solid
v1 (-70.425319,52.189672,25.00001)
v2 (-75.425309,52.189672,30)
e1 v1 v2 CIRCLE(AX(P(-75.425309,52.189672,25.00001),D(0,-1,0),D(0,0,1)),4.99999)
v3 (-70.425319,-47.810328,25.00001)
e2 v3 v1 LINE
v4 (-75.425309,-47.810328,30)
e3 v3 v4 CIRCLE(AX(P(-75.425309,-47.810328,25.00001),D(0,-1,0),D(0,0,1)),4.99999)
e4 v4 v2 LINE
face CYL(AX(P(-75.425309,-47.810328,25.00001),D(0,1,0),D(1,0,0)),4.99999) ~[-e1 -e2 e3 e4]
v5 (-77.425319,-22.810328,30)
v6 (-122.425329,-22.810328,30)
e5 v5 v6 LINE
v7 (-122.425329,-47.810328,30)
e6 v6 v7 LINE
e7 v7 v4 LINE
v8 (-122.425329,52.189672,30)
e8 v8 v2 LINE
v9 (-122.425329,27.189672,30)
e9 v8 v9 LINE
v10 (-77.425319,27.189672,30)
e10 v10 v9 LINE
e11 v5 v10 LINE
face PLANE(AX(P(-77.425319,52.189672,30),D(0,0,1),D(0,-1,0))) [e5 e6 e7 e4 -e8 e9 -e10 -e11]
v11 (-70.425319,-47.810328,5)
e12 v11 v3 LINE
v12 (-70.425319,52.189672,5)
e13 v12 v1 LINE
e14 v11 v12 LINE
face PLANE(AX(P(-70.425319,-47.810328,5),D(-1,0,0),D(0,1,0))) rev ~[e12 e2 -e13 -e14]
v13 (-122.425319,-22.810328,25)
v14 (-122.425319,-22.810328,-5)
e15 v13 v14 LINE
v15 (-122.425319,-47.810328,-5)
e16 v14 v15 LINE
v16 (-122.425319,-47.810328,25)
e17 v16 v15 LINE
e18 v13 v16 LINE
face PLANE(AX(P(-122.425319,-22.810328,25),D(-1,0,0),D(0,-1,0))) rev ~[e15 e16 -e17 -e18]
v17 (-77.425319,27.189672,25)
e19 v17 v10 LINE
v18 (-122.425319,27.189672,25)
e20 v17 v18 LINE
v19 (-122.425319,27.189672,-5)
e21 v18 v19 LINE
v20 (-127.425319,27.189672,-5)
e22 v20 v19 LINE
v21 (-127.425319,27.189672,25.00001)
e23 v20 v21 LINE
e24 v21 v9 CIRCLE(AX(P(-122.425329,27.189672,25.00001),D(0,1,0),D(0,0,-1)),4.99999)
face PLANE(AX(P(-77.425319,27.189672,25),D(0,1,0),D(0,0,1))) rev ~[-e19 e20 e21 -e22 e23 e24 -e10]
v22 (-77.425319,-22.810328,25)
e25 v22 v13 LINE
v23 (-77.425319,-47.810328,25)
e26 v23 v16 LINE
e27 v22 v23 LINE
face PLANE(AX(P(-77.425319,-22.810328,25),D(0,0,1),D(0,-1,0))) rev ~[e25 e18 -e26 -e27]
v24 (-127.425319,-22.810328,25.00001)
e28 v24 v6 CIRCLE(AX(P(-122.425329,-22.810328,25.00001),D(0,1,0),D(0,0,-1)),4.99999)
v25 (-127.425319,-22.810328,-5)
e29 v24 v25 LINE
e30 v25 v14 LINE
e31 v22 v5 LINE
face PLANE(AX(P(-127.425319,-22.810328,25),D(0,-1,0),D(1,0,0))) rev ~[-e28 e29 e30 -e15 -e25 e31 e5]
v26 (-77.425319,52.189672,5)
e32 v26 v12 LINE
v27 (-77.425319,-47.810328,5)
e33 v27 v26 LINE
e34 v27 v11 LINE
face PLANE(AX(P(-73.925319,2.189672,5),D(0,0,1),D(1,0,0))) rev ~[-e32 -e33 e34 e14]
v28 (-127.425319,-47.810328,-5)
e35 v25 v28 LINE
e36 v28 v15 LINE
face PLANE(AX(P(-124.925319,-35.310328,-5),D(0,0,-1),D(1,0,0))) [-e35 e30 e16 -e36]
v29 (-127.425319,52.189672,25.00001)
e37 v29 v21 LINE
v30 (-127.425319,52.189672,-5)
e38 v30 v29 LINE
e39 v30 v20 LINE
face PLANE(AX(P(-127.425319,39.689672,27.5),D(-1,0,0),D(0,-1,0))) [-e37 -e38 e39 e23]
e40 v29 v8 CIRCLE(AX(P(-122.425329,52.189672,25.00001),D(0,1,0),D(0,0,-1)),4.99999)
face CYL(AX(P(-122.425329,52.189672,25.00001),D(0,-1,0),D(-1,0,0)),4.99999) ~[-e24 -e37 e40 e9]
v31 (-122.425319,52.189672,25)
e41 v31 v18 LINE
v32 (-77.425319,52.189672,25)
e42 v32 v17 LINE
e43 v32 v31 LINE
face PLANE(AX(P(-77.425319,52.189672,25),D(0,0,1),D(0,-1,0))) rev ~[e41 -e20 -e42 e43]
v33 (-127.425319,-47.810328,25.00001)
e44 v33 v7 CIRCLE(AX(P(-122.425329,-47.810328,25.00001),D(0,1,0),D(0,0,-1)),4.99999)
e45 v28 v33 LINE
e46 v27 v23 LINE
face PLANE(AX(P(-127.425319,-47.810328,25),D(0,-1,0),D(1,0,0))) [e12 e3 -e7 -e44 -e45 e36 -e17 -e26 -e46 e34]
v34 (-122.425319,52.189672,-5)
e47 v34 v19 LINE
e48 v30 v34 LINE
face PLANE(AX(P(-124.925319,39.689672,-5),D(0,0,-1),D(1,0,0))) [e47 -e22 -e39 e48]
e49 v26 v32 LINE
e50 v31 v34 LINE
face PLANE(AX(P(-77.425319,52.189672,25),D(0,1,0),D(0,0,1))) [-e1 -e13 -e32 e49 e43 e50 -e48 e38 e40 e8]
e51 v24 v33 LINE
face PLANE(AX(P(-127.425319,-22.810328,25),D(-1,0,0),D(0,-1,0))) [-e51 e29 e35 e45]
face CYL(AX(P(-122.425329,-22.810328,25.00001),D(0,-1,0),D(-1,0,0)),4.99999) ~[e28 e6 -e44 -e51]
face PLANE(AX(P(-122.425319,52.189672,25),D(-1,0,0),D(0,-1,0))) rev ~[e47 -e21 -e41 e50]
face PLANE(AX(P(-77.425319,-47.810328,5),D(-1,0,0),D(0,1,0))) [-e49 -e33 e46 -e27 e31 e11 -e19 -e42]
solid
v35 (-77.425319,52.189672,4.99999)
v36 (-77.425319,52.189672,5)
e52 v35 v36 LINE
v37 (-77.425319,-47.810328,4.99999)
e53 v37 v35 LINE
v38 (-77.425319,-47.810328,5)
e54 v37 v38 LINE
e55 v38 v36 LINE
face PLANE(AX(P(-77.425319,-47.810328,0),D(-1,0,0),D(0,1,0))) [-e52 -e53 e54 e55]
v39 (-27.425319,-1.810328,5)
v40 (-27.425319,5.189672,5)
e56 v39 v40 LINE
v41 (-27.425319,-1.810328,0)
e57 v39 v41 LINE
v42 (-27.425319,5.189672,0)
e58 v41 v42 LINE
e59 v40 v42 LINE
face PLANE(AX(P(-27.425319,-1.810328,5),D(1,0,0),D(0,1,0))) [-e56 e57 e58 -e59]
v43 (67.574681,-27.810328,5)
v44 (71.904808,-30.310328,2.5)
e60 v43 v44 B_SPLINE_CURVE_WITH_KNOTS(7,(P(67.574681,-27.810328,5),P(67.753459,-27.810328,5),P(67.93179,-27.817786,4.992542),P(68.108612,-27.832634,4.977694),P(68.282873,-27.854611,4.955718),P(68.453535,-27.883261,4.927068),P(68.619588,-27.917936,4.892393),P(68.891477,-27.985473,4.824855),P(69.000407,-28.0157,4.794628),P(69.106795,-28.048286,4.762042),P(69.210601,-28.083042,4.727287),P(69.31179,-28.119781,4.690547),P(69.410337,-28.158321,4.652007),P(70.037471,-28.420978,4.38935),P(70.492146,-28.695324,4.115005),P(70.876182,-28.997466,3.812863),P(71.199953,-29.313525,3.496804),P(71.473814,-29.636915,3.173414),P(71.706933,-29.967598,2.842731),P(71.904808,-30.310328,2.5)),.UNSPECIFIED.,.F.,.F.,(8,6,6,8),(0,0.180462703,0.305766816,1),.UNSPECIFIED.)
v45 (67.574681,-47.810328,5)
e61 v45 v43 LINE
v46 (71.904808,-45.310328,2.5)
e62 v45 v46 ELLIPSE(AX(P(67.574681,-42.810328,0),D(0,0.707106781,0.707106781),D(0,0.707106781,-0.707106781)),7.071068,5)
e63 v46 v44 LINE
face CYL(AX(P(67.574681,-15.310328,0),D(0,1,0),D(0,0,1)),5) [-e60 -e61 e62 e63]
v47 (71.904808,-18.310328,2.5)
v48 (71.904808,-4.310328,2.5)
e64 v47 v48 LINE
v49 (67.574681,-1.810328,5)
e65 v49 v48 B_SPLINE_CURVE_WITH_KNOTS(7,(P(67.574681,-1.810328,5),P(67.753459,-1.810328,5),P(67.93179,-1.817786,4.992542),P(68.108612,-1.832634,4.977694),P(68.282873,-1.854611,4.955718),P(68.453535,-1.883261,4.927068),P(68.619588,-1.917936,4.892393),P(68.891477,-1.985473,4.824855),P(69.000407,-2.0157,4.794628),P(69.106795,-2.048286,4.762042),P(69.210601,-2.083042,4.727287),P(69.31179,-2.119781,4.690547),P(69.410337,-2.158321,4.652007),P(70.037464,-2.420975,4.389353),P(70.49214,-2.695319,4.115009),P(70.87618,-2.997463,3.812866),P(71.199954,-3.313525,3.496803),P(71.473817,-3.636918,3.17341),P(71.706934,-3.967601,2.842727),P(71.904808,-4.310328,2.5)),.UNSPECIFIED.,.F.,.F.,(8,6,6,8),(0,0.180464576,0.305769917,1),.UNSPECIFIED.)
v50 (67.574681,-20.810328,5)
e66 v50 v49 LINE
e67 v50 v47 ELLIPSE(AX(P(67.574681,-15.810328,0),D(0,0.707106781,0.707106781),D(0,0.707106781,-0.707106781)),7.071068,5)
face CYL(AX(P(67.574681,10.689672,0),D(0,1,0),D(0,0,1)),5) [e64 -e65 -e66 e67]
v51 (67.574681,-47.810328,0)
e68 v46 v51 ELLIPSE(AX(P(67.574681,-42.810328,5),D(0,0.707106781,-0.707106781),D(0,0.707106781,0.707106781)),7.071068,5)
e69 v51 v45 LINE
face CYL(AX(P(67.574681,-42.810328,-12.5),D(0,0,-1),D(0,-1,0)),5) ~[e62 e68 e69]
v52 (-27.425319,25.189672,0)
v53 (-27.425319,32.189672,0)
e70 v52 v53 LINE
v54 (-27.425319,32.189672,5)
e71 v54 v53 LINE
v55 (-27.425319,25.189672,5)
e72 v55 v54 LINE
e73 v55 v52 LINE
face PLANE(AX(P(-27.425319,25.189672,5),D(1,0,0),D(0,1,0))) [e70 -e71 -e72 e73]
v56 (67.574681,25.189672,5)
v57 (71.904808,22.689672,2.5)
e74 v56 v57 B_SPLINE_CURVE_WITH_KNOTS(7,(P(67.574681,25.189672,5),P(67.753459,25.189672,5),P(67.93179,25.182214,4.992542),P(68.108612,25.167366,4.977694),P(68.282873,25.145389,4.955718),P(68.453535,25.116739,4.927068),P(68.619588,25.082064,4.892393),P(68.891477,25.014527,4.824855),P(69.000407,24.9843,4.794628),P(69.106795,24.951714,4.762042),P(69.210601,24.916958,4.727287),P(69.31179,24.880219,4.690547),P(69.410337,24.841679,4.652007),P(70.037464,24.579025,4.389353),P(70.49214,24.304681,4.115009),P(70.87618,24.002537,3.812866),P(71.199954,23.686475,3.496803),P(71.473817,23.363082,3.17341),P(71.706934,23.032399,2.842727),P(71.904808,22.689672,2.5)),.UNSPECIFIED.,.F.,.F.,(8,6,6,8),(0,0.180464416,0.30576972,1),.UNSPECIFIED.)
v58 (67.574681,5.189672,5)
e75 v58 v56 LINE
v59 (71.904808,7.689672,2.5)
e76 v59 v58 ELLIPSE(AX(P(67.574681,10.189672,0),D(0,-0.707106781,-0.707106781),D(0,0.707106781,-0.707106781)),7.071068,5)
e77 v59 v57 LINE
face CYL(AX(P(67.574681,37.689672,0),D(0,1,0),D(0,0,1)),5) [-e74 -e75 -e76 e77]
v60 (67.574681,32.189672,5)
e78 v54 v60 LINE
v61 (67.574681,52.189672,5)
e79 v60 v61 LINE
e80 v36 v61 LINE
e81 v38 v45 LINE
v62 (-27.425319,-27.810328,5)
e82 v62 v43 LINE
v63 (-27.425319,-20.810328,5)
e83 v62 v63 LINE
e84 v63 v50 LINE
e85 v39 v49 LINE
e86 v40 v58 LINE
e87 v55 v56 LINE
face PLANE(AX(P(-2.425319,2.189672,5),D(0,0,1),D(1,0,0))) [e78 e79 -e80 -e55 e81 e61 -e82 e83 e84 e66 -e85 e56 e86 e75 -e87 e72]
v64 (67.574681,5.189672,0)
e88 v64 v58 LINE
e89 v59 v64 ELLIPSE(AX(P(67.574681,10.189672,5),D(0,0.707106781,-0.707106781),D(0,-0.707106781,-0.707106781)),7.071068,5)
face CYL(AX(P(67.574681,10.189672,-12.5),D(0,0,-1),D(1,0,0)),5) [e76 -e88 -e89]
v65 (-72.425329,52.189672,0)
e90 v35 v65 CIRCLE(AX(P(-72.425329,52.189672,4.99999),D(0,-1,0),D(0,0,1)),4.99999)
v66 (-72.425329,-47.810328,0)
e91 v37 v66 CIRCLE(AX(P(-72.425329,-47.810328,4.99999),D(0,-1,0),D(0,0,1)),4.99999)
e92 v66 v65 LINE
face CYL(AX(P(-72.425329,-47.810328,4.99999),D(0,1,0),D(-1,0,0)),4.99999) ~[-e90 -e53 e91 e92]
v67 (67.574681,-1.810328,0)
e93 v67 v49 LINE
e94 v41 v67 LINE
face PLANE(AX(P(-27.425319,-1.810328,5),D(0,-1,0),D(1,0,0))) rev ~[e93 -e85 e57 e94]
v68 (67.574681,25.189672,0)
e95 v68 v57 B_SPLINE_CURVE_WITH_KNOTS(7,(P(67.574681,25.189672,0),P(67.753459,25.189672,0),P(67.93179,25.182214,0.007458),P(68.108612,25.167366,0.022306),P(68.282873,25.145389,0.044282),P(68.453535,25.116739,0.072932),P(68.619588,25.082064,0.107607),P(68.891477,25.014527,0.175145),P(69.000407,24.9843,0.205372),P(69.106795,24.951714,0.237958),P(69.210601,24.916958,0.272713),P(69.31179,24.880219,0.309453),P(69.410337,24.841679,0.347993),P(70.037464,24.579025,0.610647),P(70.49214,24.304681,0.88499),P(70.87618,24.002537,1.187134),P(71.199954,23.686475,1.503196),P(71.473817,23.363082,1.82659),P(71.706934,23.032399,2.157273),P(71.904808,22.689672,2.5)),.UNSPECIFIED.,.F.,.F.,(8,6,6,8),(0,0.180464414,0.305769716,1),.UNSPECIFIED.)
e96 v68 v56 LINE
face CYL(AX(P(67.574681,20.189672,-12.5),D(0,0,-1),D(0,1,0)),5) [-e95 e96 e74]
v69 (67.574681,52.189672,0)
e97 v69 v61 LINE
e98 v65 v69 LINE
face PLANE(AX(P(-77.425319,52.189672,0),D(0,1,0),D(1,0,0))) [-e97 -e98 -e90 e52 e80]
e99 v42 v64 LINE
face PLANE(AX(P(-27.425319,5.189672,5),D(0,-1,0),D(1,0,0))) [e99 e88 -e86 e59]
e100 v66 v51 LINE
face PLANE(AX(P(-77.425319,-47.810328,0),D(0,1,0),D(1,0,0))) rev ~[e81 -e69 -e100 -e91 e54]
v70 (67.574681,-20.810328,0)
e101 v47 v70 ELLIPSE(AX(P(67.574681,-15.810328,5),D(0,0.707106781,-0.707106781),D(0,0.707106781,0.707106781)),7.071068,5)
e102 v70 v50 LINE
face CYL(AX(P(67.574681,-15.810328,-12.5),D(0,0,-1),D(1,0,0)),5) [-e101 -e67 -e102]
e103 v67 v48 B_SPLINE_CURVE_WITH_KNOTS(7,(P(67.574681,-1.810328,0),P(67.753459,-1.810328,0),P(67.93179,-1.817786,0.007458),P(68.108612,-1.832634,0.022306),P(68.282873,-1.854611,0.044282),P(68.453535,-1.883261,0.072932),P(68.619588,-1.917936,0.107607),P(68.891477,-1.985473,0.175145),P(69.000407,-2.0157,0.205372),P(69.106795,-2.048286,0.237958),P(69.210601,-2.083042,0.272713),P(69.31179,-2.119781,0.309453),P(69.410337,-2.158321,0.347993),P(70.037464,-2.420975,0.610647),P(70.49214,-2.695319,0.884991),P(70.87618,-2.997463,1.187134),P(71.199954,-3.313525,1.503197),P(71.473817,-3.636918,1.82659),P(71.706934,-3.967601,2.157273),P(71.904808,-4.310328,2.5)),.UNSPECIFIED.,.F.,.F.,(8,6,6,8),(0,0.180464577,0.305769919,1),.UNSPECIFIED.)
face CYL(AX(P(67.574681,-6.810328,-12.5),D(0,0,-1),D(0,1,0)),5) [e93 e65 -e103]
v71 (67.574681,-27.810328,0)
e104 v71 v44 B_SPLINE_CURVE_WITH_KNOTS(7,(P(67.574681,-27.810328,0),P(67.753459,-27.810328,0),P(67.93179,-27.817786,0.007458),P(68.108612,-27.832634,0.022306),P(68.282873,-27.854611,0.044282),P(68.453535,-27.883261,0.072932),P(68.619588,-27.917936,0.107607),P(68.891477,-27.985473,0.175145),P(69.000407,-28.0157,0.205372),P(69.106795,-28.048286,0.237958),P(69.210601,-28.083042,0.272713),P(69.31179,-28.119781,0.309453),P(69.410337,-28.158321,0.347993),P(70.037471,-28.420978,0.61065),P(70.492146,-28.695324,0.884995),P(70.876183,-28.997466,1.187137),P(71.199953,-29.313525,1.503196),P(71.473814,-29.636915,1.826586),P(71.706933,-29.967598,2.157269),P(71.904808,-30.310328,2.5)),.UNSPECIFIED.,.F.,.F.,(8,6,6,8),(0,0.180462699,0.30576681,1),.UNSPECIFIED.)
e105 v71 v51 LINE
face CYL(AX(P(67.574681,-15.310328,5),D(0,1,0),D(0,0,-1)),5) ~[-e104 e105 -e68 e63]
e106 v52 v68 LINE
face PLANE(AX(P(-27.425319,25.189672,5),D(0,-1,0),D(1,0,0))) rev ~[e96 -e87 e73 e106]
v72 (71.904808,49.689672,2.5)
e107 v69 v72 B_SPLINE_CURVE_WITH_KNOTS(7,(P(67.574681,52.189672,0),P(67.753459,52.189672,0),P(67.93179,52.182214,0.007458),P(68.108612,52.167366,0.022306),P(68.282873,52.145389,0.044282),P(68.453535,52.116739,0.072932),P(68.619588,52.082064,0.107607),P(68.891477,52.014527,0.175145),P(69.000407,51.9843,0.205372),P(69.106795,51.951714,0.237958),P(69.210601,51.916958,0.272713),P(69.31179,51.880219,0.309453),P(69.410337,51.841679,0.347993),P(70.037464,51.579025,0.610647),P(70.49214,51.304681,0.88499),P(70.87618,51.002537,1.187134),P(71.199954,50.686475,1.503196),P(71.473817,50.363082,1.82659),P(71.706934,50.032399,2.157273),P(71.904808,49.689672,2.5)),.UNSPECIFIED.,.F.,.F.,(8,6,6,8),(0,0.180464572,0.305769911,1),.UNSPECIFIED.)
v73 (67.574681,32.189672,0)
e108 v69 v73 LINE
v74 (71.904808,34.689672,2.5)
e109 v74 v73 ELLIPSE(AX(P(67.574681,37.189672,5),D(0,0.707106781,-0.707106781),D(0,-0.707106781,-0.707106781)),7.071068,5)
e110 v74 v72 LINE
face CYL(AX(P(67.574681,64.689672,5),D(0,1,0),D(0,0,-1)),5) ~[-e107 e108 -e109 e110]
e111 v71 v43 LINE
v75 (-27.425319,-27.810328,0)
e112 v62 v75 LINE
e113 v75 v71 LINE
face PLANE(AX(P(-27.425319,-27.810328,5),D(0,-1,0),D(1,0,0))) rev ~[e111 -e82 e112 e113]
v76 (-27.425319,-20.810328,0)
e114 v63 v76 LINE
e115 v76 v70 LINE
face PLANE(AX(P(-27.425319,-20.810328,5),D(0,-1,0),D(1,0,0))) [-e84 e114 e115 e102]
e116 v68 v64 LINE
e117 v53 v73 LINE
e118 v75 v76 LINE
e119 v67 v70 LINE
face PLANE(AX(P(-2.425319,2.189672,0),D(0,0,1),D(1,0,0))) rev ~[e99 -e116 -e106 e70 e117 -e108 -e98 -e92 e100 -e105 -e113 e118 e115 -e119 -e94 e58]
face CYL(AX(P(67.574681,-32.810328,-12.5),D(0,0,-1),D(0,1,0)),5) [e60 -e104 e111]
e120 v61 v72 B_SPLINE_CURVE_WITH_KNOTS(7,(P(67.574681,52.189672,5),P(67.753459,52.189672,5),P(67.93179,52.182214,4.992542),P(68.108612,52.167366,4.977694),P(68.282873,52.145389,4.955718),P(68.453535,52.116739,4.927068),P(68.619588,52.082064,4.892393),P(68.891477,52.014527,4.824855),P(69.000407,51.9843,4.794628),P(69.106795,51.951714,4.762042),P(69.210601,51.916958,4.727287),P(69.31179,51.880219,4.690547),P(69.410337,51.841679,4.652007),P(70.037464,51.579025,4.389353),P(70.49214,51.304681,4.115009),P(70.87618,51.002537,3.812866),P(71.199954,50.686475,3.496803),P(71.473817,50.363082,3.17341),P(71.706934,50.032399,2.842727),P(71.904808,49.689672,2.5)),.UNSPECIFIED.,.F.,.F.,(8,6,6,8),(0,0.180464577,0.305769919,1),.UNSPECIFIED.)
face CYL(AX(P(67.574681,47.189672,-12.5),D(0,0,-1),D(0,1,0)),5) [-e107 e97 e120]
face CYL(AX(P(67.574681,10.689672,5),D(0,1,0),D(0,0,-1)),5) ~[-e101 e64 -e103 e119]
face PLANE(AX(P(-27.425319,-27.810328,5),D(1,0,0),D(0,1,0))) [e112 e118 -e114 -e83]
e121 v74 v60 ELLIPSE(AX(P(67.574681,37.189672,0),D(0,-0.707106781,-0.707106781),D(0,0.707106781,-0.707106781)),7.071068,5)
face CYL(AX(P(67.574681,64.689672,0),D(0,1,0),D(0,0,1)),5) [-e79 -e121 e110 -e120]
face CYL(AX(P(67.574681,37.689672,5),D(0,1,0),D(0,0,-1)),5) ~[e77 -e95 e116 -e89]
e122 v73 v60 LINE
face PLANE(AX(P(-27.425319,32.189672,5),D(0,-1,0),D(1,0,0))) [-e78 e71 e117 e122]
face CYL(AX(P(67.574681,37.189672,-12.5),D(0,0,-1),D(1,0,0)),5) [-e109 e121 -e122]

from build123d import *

# Parameters (mm, degrees)
F0_W         = 150
F0_H         = 100
F1_DEPTH     = 5
F2_W         = 100
F2_H         = 7
F3_DEPTH     = 5.001
F4_W         = 7
F4_H         = 100
F5_DEPTH     = 25
F6_W         = 25
F6_H         = 5
F7_DEPTH     = 50
F9_W         = 5
F9_H         = 25
F8_W         = 5
F8_H         = 25
F10_DEPTH    = 30
F11_R        = 4.99999
F11_2_R      = 4.99999
F12_T1_DEPTH = 45
F12_T3_DEPTH = 30
F12_T5_DEPTH = 44
F12_T7_DEPTH = 45
F12_T9_DEPTH = 45


# Not quite as in the source:
# - a fillet or chamfer that OpenCascade refuses, or shapes differently, is made with other operations: its cross-section is extruded or revolved along the edge and cut away or added
# - a fillet or chamfer is up to 0.001 mm smaller than in the source, because OpenCascade refuses the exact size


with BuildPart() as f1:
    # F0 (on Top) → F1 (new body)
    with BuildSketch(Plane.XY):
        with Locations((-2.425318882, 2.1896716207)):
            Rectangle(F0_W, F0_H)
    extrude(amount=F1_DEPTH)

    # F2 (on face) → F3 (cut, through all)
    with BuildSketch(Plane.XY.offset(5)):
        with Locations((22.574681118, 28.6896716207)):
            Rectangle(F2_W, F2_H)
        with Locations((22.574681118, 1.6896716207)):
            Rectangle(F2_W, F2_H)
        with Locations((22.574681118, -24.3103283793)):
            Rectangle(F2_W, F2_H)
    extrude(amount=-F3_DEPTH, mode=Mode.SUBTRACT)

    # F11#2 (radius 5 in the source; OpenCascade refuses exactly that, so slightly less here)
    f11_2_edges = [f1.edges().sort_by_distance(p)[0] for p in [
        (-77.425319, 2.189672, 0),
    ]]
    fillet(f11_2_edges, radius=F11_2_R)

    # F12: fillet of radius 5 on 16 edges, made by hand

    # F12_s2 → F12_t1 (cut)
    with BuildSketch(Plane.XZ.offset(15.3103283793)):
        with BuildLine():
            ThreePointArc((67.574681118, 0), (71.110215024, 1.4644660941), (72.574681118, 5))
            Line((72.574681118, 5), (72.574681118, 0))
            Line((72.574681118, 0), (67.574681118, 0))
        make_face()
        with BuildLine():
            ThreePointArc((67.574681118, 5), (71.110215024, 3.5355339059), (72.574681118, 0))
            Line((72.574681118, 0), (72.574681118, 5))
            Line((72.574681118, 5), (67.574681118, 5))
        make_face()
    extrude(amount=F12_T1_DEPTH, mode=Mode.SUBTRACT)

    # F12_s4 → F12_t3 (cut)
    with BuildSketch(Plane.XY.offset(-12.5)):
        with BuildLine():
            ThreePointArc((67.574681118, -27.8103283793), (71.110215024, -29.2747944733), (72.574681118, -32.8103283793))
            Line((72.574681118, -32.8103283793), (72.574681118, -27.8103283793))
            Line((72.574681118, -27.8103283793), (67.574681118, -27.8103283793))
        make_face()
        with BuildLine():
            ThreePointArc((67.574681118, -47.8103283793), (71.110215024, -46.3458622852), (72.574681118, -42.8103283793))
            Line((72.574681118, -42.8103283793), (72.574681118, -47.8103283793))
            Line((72.574681118, -47.8103283793), (67.574681118, -47.8103283793))
        make_face()
        with BuildLine():
            ThreePointArc((67.574681118, -1.8103283793), (71.110215024, -3.2747944733), (72.574681118, -6.8103283793))
            Line((72.574681118, -6.8103283793), (72.574681118, -1.8103283793))
            Line((72.574681118, -1.8103283793), (67.574681118, -1.8103283793))
        make_face()
        with BuildLine():
            ThreePointArc((72.574681118, -15.8103283793), (71.110215024, -19.3458622852), (67.574681118, -20.8103283793))
            Line((67.574681118, -20.8103283793), (72.574681118, -20.8103283793))
            Line((72.574681118, -20.8103283793), (72.574681118, -15.8103283793))
        make_face()
        with BuildLine():
            ThreePointArc((67.574681118, 25.1896716207), (71.110215024, 23.7252055267), (72.574681118, 20.1896716207))
            Line((72.574681118, 20.1896716207), (72.574681118, 25.1896716207))
            Line((72.574681118, 25.1896716207), (67.574681118, 25.1896716207))
        make_face()
        with BuildLine():
            ThreePointArc((72.574681118, 10.1896716207), (71.110215024, 6.6541377148), (67.574681118, 5.1896716207))
            Line((67.574681118, 5.1896716207), (72.574681118, 5.1896716207))
            Line((72.574681118, 5.1896716207), (72.574681118, 10.1896716207))
        make_face()
        with BuildLine():
            ThreePointArc((67.574681118, 52.1896716207), (71.110215024, 50.7252055267), (72.574681118, 47.1896716207))
            Line((72.574681118, 47.1896716207), (72.574681118, 52.1896716207))
            Line((72.574681118, 52.1896716207), (67.574681118, 52.1896716207))
        make_face()
        with BuildLine():
            ThreePointArc((72.574681118, 37.1896716207), (71.110215024, 33.6541377148), (67.574681118, 32.1896716207))
            Line((67.574681118, 32.1896716207), (72.574681118, 32.1896716207))
            Line((72.574681118, 32.1896716207), (72.574681118, 37.1896716207))
        make_face()
    extrude(amount=F12_T3_DEPTH, mode=Mode.SUBTRACT)

    # F12_s6 → F12_t5 (cut)
    with BuildSketch(Plane.XZ.offset(-10.6896716207)):
        with BuildLine():
            ThreePointArc((67.574681118, 0), (71.110215024, 1.4644660941), (72.574681118, 5))
            Line((72.574681118, 5), (72.574681118, 0))
            Line((72.574681118, 0), (67.574681118, 0))
        make_face()
        with BuildLine():
            ThreePointArc((67.574681118, 5), (71.110215024, 3.5355339059), (72.574681118, 0))
            Line((72.574681118, 0), (72.574681118, 5))
            Line((72.574681118, 5), (67.574681118, 5))
        make_face()
    extrude(amount=F12_T5_DEPTH, mode=Mode.SUBTRACT)

    # F12_s8 → F12_t7 (cut)
    with BuildSketch(Plane.XZ.offset(-37.6896716207)):
        with BuildLine():
            ThreePointArc((67.574681118, 0), (71.110215024, 1.4644660941), (72.574681118, 5))
            Line((72.574681118, 5), (72.574681118, 0))
            Line((72.574681118, 0), (67.574681118, 0))
        make_face()
        with BuildLine():
            ThreePointArc((67.574681118, 5), (71.110215024, 3.5355339059), (72.574681118, 0))
            Line((72.574681118, 0), (72.574681118, 5))
            Line((72.574681118, 5), (67.574681118, 5))
        make_face()
    extrude(amount=F12_T7_DEPTH, mode=Mode.SUBTRACT)

    # F12_s10 → F12_t9 (cut)
    with BuildSketch(Plane.XZ.offset(-64.6896716207)):
        with BuildLine():
            ThreePointArc((67.574681118, 0), (71.110215024, 1.4644660941), (72.574681118, 5))
            Line((72.574681118, 5), (72.574681118, 0))
            Line((72.574681118, 0), (67.574681118, 0))
        make_face()
        with BuildLine():
            ThreePointArc((67.574681118, 5), (71.110215024, 3.5355339059), (72.574681118, 0))
            Line((72.574681118, 0), (72.574681118, 5))
            Line((72.574681118, 5), (67.574681118, 5))
        make_face()
    extrude(amount=F12_T9_DEPTH, mode=Mode.SUBTRACT)


with BuildPart() as f5:
    # F4 (on face) → F5 (new body)
    with BuildSketch(Plane.XY.offset(5)):
        with Locations((-73.925318882, 2.1896716207)):
            Rectangle(F4_W, F4_H)
    extrude(amount=F5_DEPTH)

    # F6 (on face) → F7 (join)
    with BuildSketch(Plane(origin=(-77.425318882, 0, 0), x_dir=(0, -1, 0), z_dir=(-1, 0, 0))):
        with Locations((-39.6896716207, 27.5)):
            Rectangle(F6_W, F6_H)
        with Locations((35.3103283793, 27.5)):
            Rectangle(F6_W, F6_H)
    extrude(amount=F7_DEPTH)

    # F9 (on face) + F8 (on face) → F10 (join)
    with BuildSketch(Plane(origin=(0, 0, 25), x_dir=(1, 0, 0), z_dir=(0, 0, -1))):
        with Locations((-124.925318882, 35.3103283793)):
            Rectangle(F9_W, F9_H)
    with BuildSketch(Plane(origin=(0, 0, 25), x_dir=(1, 0, 0), z_dir=(0, 0, -1))):
        with Locations((-124.925318882, -39.6896716207)):
            Rectangle(F8_W, F8_H)
    extrude(amount=F10_DEPTH)

    # F11 (radius 5 in the source; OpenCascade refuses exactly that, so slightly less here)
    f11_edges = [f5.edges().sort_by_distance(p)[0] for p in [
        (-127.425319, 39.689672, 30),
        (-127.425319, -35.310328, 30),
        (-70.425319, 2.189672, 30),
    ]]
    fillet(f11_edges, radius=F11_R)


solid = Compound([f1.part, f5.part])
